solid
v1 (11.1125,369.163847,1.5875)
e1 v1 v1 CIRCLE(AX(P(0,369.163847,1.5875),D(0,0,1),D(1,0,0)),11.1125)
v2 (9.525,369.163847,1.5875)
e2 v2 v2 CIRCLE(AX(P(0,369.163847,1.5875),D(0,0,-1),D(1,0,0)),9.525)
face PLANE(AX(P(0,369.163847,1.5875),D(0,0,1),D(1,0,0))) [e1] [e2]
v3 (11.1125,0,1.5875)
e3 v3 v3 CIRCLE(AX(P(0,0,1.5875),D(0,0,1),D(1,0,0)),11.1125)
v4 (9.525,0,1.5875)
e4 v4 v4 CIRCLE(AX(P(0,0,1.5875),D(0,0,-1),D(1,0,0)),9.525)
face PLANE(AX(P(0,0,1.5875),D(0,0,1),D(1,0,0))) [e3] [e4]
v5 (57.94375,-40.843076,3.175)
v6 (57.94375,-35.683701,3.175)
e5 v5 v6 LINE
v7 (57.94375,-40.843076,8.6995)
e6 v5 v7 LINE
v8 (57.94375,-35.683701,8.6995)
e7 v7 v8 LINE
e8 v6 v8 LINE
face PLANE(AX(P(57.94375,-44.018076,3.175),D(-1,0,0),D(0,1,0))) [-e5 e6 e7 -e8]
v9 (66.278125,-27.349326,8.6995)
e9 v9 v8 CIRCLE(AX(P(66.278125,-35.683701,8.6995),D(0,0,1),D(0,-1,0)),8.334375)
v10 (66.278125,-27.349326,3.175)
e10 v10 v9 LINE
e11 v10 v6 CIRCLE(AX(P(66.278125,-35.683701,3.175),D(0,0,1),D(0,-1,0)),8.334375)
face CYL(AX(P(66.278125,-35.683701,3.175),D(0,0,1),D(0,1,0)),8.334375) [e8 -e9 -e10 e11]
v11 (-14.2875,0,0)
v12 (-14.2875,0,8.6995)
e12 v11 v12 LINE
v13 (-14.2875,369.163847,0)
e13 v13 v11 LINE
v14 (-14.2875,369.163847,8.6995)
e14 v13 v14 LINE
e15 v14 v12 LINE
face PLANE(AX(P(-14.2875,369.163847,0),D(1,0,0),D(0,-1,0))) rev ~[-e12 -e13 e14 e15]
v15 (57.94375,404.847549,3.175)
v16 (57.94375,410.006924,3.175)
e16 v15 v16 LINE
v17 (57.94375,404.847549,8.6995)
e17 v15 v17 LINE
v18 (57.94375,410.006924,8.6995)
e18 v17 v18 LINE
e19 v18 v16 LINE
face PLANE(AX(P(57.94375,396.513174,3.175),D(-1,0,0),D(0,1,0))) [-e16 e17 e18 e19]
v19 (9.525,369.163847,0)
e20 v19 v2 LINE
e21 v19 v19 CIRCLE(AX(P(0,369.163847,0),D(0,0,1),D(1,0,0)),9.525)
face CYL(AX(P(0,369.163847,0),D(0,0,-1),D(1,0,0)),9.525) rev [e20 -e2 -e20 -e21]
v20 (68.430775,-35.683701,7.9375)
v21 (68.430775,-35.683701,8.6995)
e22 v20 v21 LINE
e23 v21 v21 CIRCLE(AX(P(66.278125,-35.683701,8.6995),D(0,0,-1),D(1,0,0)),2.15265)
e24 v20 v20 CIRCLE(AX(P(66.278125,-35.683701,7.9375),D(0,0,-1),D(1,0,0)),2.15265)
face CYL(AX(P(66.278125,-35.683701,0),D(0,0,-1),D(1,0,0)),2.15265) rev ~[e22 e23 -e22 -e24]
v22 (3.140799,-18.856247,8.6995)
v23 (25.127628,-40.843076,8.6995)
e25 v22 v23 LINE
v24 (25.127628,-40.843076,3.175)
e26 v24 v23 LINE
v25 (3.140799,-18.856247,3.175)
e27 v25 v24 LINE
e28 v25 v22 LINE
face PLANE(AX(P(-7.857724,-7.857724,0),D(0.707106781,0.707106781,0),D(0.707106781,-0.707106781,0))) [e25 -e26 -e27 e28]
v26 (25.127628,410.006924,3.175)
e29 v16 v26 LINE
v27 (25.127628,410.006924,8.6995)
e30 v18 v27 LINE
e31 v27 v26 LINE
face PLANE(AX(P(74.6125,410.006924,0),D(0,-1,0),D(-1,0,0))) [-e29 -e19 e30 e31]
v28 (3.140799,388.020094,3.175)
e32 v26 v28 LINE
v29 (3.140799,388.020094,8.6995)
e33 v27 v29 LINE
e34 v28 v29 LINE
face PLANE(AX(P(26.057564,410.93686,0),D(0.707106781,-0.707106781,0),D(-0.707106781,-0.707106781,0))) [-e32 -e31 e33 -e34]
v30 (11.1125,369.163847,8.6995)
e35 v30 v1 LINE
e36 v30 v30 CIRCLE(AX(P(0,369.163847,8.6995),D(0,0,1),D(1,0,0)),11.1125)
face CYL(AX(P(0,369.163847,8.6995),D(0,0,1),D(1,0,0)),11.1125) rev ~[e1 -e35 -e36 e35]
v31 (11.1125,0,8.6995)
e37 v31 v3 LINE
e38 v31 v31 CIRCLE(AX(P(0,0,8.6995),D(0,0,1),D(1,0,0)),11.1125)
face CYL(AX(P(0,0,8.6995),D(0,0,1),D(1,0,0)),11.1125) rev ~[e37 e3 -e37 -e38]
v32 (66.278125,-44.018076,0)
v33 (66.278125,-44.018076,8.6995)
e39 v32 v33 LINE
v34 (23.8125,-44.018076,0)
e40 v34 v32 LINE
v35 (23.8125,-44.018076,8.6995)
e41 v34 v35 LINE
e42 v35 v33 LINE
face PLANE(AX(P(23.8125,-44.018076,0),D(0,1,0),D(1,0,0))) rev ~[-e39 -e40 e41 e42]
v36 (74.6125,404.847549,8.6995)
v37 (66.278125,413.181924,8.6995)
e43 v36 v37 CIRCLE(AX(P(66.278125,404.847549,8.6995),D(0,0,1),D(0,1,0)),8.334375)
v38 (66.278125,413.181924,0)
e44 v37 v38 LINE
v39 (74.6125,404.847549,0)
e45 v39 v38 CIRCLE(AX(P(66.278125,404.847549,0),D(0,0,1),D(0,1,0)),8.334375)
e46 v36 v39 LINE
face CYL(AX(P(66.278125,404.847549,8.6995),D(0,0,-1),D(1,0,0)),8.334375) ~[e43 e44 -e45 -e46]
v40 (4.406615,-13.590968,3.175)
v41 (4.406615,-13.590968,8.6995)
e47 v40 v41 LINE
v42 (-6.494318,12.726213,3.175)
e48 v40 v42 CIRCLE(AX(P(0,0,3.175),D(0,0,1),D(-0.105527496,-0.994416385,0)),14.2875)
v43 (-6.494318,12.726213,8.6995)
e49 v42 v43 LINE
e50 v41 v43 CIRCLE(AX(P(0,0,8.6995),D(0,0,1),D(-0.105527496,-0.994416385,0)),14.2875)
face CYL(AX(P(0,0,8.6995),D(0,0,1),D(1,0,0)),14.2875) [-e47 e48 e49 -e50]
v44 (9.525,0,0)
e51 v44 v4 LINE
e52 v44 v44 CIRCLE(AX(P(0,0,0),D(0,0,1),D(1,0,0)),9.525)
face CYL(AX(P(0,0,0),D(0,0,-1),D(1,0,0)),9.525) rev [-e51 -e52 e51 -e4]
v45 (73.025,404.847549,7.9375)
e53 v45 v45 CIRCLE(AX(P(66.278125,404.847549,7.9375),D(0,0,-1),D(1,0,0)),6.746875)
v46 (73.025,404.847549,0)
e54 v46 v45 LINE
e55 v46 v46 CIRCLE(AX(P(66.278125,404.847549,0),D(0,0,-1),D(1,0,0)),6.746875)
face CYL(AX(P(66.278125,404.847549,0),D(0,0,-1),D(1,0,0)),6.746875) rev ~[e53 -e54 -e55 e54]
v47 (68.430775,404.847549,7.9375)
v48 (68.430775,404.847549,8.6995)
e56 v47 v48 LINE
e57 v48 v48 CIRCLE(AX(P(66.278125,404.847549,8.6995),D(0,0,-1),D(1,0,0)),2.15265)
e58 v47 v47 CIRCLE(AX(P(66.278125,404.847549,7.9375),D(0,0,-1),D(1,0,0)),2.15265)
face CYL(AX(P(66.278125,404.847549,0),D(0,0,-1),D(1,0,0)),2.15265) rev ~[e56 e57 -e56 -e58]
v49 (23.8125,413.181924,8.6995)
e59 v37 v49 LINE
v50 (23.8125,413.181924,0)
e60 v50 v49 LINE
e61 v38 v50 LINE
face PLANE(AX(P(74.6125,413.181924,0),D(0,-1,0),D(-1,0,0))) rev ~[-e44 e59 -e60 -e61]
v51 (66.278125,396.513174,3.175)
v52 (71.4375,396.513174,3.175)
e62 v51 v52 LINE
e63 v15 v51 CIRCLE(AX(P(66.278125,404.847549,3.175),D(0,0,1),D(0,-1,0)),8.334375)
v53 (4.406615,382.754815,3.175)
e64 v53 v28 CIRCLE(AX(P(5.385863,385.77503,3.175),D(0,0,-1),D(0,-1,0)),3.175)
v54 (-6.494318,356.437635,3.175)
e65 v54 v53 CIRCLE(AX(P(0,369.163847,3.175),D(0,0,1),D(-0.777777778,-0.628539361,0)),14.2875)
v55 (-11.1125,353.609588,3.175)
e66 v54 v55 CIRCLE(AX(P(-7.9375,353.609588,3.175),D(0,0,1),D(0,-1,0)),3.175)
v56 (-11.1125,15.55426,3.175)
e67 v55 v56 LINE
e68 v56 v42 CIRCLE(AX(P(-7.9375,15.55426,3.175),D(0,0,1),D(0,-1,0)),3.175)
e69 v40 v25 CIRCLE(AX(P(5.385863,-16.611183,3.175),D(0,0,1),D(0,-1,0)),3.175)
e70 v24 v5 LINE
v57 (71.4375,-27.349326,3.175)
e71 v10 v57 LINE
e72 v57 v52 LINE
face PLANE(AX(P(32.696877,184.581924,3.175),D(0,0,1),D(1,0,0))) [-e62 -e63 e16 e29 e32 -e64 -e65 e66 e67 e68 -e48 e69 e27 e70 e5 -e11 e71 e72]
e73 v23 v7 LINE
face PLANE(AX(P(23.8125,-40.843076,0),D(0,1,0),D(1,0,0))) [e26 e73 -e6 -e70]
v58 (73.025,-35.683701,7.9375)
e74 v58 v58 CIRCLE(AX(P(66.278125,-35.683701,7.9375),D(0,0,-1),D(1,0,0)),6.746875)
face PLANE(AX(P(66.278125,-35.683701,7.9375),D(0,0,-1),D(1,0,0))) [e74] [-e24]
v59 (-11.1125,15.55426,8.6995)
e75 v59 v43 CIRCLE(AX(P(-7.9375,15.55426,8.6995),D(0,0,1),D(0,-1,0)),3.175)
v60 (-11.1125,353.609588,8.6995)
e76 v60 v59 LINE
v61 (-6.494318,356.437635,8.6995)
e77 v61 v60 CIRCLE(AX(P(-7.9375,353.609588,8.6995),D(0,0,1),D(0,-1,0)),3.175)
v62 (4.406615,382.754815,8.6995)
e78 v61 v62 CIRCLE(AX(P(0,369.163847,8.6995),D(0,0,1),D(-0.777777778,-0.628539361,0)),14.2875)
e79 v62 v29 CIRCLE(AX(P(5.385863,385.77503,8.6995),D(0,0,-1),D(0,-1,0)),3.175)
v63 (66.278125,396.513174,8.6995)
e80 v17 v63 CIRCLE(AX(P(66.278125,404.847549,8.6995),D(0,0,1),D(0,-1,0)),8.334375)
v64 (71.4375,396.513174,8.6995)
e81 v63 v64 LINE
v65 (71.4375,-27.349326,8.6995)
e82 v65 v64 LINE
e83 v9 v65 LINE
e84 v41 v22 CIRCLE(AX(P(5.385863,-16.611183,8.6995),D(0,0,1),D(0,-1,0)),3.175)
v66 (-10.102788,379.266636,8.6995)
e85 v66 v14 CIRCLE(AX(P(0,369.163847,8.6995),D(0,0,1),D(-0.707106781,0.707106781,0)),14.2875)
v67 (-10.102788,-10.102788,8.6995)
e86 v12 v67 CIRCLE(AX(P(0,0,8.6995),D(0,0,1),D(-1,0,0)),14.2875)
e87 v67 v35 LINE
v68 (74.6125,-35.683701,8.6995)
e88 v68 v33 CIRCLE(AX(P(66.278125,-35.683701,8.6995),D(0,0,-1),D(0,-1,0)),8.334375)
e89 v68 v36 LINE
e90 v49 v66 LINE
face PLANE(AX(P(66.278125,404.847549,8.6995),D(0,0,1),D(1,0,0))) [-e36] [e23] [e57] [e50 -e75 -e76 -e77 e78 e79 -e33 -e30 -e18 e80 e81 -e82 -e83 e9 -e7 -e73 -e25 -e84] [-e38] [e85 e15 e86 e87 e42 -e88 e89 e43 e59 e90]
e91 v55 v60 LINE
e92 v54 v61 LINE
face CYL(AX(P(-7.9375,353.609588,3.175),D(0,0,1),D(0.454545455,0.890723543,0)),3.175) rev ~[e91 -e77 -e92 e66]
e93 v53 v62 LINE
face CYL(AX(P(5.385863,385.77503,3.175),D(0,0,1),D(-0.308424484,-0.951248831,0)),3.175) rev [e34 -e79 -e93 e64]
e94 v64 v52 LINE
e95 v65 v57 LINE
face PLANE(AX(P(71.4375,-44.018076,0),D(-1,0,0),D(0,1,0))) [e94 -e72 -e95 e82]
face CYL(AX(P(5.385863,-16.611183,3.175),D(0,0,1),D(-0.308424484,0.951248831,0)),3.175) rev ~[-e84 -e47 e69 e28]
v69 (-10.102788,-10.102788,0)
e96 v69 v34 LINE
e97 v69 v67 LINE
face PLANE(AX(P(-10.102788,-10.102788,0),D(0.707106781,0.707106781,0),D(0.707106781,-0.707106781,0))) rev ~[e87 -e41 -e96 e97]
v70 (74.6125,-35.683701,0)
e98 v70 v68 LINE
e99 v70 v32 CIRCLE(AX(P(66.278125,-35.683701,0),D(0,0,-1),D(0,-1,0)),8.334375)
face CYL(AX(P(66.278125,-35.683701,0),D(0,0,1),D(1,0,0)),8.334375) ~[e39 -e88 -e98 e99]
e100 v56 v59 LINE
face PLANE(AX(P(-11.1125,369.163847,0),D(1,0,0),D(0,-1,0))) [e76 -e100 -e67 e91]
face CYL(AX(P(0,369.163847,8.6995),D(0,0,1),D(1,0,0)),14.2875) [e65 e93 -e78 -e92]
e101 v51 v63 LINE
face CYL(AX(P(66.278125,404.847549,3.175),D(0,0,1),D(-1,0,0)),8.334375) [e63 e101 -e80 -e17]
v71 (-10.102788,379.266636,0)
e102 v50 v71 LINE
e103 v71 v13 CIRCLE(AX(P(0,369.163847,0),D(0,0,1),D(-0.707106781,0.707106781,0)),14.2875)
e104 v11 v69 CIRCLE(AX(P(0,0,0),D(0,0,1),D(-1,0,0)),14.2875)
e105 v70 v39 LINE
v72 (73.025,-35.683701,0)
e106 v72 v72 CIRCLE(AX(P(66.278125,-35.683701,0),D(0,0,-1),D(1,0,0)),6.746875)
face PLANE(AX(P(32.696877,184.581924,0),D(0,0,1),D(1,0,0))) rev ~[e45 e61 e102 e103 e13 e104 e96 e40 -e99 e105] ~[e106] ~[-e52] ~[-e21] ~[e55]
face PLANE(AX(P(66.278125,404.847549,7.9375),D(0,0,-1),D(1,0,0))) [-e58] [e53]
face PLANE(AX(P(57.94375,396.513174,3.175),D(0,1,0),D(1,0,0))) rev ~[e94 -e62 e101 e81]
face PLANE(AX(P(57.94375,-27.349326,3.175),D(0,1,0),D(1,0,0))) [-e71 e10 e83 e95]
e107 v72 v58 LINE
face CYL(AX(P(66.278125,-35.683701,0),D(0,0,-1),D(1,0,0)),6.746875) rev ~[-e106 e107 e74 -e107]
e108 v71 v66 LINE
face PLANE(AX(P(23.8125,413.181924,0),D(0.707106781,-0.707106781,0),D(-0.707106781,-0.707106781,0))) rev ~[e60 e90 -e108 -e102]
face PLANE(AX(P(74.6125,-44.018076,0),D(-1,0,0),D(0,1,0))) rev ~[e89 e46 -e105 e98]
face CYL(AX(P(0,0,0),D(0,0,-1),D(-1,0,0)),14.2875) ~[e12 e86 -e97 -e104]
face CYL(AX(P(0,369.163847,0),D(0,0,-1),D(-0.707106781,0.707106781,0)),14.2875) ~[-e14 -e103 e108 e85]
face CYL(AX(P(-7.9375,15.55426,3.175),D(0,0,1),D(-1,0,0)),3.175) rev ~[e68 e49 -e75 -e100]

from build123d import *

# Parameters (mm, degrees)
F0_R      = 9.525
F1_DEPTH  = 8.6995
F2_R      = 11.1125
F3_DEPTH  = 7.112
F4_T      = -3.175
F5_R      = 3.175
F6_W      = 16.66875
F6_H      = 16.66875
F7_DEPTH  = 5.5245
F8_R      = 8.334375
F9_R      = 6.746875
F10_DEPTH = 7.9375
F11_R     = 2.15265
F12_DEPTH = 8.6995


with BuildPart() as f1:
    # F0 (on Top) → F1 (new body)
    with BuildSketch(Plane.XY):
        with BuildLine():
            Line((-14.2875, 369.1638474552), (-14.2875, 0))
            ThreePointArc((-14.2875, 0), (-13.1999288208, -5.4675895399), (-10.1027881362, -10.1027881362))
            Line((-10.1027881362, -10.1027881362), (23.8125, -44.0180762724))
            Line((23.8125, -44.0180762724), (74.6125, -44.0180762724))
            Line((74.6125, -44.0180762724), (74.6125, 413.1819237276))
            Line((74.6125, 413.1819237276), (23.8125, 413.1819237276))
            Line((23.8125, 413.1819237276), (-10.1027881362, 379.2666355914))
            ThreePointArc((-10.1027881362, 379.2666355914), (-13.1999288208, 374.6314369951), (-14.2875, 369.1638474552))
        make_face()
        Circle(F0_R, mode=Mode.SUBTRACT)
        with Locations((0, 369.1638474552)):
            Circle(F0_R, mode=Mode.SUBTRACT)
    extrude(amount=F1_DEPTH)

    # F2 (on face) → F3 (cut)
    with BuildSketch(Plane.XY.offset(8.6995)):
        with Locations((0, 369.1638474552)):
            Circle(F2_R)
        Circle(F2_R)
    extrude(amount=-F3_DEPTH, mode=Mode.SUBTRACT)

    # F4
    f4_openings = [f1.faces().sort_by_distance(p)[0] for p in [
        (31.981731, 184.581924, 8.6995),
    ]]
    offset(amount=F4_T, openings=f4_openings)

    # F5
    f5_edges = [f1.edges().sort_by_distance(p)[0] for p in [
        (-1.507724, 383.371572, 5.93725),
        (-11.1125, 360.183591, 5.93725),
        (-11.1125, 8.980256, 5.93725),
        (-1.507724, -14.207724, 5.93725),
    ]]
    fillet(f5_edges, radius=F5_R)

    # F6 (on face) → F7 (join, through all)
    with BuildSketch(Plane.XY.offset(3.175)):
        with Locations((66.278125, 404.8475487276)):
            Rectangle(F6_W, F6_H)
        with Locations((66.278125, -35.6837012724)):
            Rectangle(F6_W, F6_H)
    extrude(amount=F7_DEPTH)

    # F8
    f8_edges = [f1.edges().sort_by_distance(p)[0] for p in [
        (74.6125, 413.181924, 4.34975),
        (74.6125, -44.018076, 4.34975),
        (57.94375, -27.349326, 5.93725),
        (57.94375, 396.513174, 5.93725),
    ]]
    fillet(f8_edges, radius=F8_R)

    # F9 (on face) → F10 (cut)
    with BuildSketch(Plane(origin=(0, 0, 0), x_dir=(1, 0, 0), z_dir=(0, 0, -1))):
        with Locations((66.278125, 35.6837012724)):
            Circle(F9_R)
        with Locations((66.278125, -404.8475487276)):
            Circle(F9_R)
    extrude(amount=-F10_DEPTH, mode=Mode.SUBTRACT)

    # F11 (on face) → F12 (cut, through all)
    with BuildSketch(Plane(origin=(0, 0, 0), x_dir=(1, 0, 0), z_dir=(0, 0, -1))):
        with Locations((66.278125, 35.6837012724)):
            Circle(F11_R)
        with Locations((66.278125, -404.8475487276)):
            Circle(F11_R)
    extrude(amount=-F12_DEPTH, mode=Mode.SUBTRACT)


solid = f1.part
